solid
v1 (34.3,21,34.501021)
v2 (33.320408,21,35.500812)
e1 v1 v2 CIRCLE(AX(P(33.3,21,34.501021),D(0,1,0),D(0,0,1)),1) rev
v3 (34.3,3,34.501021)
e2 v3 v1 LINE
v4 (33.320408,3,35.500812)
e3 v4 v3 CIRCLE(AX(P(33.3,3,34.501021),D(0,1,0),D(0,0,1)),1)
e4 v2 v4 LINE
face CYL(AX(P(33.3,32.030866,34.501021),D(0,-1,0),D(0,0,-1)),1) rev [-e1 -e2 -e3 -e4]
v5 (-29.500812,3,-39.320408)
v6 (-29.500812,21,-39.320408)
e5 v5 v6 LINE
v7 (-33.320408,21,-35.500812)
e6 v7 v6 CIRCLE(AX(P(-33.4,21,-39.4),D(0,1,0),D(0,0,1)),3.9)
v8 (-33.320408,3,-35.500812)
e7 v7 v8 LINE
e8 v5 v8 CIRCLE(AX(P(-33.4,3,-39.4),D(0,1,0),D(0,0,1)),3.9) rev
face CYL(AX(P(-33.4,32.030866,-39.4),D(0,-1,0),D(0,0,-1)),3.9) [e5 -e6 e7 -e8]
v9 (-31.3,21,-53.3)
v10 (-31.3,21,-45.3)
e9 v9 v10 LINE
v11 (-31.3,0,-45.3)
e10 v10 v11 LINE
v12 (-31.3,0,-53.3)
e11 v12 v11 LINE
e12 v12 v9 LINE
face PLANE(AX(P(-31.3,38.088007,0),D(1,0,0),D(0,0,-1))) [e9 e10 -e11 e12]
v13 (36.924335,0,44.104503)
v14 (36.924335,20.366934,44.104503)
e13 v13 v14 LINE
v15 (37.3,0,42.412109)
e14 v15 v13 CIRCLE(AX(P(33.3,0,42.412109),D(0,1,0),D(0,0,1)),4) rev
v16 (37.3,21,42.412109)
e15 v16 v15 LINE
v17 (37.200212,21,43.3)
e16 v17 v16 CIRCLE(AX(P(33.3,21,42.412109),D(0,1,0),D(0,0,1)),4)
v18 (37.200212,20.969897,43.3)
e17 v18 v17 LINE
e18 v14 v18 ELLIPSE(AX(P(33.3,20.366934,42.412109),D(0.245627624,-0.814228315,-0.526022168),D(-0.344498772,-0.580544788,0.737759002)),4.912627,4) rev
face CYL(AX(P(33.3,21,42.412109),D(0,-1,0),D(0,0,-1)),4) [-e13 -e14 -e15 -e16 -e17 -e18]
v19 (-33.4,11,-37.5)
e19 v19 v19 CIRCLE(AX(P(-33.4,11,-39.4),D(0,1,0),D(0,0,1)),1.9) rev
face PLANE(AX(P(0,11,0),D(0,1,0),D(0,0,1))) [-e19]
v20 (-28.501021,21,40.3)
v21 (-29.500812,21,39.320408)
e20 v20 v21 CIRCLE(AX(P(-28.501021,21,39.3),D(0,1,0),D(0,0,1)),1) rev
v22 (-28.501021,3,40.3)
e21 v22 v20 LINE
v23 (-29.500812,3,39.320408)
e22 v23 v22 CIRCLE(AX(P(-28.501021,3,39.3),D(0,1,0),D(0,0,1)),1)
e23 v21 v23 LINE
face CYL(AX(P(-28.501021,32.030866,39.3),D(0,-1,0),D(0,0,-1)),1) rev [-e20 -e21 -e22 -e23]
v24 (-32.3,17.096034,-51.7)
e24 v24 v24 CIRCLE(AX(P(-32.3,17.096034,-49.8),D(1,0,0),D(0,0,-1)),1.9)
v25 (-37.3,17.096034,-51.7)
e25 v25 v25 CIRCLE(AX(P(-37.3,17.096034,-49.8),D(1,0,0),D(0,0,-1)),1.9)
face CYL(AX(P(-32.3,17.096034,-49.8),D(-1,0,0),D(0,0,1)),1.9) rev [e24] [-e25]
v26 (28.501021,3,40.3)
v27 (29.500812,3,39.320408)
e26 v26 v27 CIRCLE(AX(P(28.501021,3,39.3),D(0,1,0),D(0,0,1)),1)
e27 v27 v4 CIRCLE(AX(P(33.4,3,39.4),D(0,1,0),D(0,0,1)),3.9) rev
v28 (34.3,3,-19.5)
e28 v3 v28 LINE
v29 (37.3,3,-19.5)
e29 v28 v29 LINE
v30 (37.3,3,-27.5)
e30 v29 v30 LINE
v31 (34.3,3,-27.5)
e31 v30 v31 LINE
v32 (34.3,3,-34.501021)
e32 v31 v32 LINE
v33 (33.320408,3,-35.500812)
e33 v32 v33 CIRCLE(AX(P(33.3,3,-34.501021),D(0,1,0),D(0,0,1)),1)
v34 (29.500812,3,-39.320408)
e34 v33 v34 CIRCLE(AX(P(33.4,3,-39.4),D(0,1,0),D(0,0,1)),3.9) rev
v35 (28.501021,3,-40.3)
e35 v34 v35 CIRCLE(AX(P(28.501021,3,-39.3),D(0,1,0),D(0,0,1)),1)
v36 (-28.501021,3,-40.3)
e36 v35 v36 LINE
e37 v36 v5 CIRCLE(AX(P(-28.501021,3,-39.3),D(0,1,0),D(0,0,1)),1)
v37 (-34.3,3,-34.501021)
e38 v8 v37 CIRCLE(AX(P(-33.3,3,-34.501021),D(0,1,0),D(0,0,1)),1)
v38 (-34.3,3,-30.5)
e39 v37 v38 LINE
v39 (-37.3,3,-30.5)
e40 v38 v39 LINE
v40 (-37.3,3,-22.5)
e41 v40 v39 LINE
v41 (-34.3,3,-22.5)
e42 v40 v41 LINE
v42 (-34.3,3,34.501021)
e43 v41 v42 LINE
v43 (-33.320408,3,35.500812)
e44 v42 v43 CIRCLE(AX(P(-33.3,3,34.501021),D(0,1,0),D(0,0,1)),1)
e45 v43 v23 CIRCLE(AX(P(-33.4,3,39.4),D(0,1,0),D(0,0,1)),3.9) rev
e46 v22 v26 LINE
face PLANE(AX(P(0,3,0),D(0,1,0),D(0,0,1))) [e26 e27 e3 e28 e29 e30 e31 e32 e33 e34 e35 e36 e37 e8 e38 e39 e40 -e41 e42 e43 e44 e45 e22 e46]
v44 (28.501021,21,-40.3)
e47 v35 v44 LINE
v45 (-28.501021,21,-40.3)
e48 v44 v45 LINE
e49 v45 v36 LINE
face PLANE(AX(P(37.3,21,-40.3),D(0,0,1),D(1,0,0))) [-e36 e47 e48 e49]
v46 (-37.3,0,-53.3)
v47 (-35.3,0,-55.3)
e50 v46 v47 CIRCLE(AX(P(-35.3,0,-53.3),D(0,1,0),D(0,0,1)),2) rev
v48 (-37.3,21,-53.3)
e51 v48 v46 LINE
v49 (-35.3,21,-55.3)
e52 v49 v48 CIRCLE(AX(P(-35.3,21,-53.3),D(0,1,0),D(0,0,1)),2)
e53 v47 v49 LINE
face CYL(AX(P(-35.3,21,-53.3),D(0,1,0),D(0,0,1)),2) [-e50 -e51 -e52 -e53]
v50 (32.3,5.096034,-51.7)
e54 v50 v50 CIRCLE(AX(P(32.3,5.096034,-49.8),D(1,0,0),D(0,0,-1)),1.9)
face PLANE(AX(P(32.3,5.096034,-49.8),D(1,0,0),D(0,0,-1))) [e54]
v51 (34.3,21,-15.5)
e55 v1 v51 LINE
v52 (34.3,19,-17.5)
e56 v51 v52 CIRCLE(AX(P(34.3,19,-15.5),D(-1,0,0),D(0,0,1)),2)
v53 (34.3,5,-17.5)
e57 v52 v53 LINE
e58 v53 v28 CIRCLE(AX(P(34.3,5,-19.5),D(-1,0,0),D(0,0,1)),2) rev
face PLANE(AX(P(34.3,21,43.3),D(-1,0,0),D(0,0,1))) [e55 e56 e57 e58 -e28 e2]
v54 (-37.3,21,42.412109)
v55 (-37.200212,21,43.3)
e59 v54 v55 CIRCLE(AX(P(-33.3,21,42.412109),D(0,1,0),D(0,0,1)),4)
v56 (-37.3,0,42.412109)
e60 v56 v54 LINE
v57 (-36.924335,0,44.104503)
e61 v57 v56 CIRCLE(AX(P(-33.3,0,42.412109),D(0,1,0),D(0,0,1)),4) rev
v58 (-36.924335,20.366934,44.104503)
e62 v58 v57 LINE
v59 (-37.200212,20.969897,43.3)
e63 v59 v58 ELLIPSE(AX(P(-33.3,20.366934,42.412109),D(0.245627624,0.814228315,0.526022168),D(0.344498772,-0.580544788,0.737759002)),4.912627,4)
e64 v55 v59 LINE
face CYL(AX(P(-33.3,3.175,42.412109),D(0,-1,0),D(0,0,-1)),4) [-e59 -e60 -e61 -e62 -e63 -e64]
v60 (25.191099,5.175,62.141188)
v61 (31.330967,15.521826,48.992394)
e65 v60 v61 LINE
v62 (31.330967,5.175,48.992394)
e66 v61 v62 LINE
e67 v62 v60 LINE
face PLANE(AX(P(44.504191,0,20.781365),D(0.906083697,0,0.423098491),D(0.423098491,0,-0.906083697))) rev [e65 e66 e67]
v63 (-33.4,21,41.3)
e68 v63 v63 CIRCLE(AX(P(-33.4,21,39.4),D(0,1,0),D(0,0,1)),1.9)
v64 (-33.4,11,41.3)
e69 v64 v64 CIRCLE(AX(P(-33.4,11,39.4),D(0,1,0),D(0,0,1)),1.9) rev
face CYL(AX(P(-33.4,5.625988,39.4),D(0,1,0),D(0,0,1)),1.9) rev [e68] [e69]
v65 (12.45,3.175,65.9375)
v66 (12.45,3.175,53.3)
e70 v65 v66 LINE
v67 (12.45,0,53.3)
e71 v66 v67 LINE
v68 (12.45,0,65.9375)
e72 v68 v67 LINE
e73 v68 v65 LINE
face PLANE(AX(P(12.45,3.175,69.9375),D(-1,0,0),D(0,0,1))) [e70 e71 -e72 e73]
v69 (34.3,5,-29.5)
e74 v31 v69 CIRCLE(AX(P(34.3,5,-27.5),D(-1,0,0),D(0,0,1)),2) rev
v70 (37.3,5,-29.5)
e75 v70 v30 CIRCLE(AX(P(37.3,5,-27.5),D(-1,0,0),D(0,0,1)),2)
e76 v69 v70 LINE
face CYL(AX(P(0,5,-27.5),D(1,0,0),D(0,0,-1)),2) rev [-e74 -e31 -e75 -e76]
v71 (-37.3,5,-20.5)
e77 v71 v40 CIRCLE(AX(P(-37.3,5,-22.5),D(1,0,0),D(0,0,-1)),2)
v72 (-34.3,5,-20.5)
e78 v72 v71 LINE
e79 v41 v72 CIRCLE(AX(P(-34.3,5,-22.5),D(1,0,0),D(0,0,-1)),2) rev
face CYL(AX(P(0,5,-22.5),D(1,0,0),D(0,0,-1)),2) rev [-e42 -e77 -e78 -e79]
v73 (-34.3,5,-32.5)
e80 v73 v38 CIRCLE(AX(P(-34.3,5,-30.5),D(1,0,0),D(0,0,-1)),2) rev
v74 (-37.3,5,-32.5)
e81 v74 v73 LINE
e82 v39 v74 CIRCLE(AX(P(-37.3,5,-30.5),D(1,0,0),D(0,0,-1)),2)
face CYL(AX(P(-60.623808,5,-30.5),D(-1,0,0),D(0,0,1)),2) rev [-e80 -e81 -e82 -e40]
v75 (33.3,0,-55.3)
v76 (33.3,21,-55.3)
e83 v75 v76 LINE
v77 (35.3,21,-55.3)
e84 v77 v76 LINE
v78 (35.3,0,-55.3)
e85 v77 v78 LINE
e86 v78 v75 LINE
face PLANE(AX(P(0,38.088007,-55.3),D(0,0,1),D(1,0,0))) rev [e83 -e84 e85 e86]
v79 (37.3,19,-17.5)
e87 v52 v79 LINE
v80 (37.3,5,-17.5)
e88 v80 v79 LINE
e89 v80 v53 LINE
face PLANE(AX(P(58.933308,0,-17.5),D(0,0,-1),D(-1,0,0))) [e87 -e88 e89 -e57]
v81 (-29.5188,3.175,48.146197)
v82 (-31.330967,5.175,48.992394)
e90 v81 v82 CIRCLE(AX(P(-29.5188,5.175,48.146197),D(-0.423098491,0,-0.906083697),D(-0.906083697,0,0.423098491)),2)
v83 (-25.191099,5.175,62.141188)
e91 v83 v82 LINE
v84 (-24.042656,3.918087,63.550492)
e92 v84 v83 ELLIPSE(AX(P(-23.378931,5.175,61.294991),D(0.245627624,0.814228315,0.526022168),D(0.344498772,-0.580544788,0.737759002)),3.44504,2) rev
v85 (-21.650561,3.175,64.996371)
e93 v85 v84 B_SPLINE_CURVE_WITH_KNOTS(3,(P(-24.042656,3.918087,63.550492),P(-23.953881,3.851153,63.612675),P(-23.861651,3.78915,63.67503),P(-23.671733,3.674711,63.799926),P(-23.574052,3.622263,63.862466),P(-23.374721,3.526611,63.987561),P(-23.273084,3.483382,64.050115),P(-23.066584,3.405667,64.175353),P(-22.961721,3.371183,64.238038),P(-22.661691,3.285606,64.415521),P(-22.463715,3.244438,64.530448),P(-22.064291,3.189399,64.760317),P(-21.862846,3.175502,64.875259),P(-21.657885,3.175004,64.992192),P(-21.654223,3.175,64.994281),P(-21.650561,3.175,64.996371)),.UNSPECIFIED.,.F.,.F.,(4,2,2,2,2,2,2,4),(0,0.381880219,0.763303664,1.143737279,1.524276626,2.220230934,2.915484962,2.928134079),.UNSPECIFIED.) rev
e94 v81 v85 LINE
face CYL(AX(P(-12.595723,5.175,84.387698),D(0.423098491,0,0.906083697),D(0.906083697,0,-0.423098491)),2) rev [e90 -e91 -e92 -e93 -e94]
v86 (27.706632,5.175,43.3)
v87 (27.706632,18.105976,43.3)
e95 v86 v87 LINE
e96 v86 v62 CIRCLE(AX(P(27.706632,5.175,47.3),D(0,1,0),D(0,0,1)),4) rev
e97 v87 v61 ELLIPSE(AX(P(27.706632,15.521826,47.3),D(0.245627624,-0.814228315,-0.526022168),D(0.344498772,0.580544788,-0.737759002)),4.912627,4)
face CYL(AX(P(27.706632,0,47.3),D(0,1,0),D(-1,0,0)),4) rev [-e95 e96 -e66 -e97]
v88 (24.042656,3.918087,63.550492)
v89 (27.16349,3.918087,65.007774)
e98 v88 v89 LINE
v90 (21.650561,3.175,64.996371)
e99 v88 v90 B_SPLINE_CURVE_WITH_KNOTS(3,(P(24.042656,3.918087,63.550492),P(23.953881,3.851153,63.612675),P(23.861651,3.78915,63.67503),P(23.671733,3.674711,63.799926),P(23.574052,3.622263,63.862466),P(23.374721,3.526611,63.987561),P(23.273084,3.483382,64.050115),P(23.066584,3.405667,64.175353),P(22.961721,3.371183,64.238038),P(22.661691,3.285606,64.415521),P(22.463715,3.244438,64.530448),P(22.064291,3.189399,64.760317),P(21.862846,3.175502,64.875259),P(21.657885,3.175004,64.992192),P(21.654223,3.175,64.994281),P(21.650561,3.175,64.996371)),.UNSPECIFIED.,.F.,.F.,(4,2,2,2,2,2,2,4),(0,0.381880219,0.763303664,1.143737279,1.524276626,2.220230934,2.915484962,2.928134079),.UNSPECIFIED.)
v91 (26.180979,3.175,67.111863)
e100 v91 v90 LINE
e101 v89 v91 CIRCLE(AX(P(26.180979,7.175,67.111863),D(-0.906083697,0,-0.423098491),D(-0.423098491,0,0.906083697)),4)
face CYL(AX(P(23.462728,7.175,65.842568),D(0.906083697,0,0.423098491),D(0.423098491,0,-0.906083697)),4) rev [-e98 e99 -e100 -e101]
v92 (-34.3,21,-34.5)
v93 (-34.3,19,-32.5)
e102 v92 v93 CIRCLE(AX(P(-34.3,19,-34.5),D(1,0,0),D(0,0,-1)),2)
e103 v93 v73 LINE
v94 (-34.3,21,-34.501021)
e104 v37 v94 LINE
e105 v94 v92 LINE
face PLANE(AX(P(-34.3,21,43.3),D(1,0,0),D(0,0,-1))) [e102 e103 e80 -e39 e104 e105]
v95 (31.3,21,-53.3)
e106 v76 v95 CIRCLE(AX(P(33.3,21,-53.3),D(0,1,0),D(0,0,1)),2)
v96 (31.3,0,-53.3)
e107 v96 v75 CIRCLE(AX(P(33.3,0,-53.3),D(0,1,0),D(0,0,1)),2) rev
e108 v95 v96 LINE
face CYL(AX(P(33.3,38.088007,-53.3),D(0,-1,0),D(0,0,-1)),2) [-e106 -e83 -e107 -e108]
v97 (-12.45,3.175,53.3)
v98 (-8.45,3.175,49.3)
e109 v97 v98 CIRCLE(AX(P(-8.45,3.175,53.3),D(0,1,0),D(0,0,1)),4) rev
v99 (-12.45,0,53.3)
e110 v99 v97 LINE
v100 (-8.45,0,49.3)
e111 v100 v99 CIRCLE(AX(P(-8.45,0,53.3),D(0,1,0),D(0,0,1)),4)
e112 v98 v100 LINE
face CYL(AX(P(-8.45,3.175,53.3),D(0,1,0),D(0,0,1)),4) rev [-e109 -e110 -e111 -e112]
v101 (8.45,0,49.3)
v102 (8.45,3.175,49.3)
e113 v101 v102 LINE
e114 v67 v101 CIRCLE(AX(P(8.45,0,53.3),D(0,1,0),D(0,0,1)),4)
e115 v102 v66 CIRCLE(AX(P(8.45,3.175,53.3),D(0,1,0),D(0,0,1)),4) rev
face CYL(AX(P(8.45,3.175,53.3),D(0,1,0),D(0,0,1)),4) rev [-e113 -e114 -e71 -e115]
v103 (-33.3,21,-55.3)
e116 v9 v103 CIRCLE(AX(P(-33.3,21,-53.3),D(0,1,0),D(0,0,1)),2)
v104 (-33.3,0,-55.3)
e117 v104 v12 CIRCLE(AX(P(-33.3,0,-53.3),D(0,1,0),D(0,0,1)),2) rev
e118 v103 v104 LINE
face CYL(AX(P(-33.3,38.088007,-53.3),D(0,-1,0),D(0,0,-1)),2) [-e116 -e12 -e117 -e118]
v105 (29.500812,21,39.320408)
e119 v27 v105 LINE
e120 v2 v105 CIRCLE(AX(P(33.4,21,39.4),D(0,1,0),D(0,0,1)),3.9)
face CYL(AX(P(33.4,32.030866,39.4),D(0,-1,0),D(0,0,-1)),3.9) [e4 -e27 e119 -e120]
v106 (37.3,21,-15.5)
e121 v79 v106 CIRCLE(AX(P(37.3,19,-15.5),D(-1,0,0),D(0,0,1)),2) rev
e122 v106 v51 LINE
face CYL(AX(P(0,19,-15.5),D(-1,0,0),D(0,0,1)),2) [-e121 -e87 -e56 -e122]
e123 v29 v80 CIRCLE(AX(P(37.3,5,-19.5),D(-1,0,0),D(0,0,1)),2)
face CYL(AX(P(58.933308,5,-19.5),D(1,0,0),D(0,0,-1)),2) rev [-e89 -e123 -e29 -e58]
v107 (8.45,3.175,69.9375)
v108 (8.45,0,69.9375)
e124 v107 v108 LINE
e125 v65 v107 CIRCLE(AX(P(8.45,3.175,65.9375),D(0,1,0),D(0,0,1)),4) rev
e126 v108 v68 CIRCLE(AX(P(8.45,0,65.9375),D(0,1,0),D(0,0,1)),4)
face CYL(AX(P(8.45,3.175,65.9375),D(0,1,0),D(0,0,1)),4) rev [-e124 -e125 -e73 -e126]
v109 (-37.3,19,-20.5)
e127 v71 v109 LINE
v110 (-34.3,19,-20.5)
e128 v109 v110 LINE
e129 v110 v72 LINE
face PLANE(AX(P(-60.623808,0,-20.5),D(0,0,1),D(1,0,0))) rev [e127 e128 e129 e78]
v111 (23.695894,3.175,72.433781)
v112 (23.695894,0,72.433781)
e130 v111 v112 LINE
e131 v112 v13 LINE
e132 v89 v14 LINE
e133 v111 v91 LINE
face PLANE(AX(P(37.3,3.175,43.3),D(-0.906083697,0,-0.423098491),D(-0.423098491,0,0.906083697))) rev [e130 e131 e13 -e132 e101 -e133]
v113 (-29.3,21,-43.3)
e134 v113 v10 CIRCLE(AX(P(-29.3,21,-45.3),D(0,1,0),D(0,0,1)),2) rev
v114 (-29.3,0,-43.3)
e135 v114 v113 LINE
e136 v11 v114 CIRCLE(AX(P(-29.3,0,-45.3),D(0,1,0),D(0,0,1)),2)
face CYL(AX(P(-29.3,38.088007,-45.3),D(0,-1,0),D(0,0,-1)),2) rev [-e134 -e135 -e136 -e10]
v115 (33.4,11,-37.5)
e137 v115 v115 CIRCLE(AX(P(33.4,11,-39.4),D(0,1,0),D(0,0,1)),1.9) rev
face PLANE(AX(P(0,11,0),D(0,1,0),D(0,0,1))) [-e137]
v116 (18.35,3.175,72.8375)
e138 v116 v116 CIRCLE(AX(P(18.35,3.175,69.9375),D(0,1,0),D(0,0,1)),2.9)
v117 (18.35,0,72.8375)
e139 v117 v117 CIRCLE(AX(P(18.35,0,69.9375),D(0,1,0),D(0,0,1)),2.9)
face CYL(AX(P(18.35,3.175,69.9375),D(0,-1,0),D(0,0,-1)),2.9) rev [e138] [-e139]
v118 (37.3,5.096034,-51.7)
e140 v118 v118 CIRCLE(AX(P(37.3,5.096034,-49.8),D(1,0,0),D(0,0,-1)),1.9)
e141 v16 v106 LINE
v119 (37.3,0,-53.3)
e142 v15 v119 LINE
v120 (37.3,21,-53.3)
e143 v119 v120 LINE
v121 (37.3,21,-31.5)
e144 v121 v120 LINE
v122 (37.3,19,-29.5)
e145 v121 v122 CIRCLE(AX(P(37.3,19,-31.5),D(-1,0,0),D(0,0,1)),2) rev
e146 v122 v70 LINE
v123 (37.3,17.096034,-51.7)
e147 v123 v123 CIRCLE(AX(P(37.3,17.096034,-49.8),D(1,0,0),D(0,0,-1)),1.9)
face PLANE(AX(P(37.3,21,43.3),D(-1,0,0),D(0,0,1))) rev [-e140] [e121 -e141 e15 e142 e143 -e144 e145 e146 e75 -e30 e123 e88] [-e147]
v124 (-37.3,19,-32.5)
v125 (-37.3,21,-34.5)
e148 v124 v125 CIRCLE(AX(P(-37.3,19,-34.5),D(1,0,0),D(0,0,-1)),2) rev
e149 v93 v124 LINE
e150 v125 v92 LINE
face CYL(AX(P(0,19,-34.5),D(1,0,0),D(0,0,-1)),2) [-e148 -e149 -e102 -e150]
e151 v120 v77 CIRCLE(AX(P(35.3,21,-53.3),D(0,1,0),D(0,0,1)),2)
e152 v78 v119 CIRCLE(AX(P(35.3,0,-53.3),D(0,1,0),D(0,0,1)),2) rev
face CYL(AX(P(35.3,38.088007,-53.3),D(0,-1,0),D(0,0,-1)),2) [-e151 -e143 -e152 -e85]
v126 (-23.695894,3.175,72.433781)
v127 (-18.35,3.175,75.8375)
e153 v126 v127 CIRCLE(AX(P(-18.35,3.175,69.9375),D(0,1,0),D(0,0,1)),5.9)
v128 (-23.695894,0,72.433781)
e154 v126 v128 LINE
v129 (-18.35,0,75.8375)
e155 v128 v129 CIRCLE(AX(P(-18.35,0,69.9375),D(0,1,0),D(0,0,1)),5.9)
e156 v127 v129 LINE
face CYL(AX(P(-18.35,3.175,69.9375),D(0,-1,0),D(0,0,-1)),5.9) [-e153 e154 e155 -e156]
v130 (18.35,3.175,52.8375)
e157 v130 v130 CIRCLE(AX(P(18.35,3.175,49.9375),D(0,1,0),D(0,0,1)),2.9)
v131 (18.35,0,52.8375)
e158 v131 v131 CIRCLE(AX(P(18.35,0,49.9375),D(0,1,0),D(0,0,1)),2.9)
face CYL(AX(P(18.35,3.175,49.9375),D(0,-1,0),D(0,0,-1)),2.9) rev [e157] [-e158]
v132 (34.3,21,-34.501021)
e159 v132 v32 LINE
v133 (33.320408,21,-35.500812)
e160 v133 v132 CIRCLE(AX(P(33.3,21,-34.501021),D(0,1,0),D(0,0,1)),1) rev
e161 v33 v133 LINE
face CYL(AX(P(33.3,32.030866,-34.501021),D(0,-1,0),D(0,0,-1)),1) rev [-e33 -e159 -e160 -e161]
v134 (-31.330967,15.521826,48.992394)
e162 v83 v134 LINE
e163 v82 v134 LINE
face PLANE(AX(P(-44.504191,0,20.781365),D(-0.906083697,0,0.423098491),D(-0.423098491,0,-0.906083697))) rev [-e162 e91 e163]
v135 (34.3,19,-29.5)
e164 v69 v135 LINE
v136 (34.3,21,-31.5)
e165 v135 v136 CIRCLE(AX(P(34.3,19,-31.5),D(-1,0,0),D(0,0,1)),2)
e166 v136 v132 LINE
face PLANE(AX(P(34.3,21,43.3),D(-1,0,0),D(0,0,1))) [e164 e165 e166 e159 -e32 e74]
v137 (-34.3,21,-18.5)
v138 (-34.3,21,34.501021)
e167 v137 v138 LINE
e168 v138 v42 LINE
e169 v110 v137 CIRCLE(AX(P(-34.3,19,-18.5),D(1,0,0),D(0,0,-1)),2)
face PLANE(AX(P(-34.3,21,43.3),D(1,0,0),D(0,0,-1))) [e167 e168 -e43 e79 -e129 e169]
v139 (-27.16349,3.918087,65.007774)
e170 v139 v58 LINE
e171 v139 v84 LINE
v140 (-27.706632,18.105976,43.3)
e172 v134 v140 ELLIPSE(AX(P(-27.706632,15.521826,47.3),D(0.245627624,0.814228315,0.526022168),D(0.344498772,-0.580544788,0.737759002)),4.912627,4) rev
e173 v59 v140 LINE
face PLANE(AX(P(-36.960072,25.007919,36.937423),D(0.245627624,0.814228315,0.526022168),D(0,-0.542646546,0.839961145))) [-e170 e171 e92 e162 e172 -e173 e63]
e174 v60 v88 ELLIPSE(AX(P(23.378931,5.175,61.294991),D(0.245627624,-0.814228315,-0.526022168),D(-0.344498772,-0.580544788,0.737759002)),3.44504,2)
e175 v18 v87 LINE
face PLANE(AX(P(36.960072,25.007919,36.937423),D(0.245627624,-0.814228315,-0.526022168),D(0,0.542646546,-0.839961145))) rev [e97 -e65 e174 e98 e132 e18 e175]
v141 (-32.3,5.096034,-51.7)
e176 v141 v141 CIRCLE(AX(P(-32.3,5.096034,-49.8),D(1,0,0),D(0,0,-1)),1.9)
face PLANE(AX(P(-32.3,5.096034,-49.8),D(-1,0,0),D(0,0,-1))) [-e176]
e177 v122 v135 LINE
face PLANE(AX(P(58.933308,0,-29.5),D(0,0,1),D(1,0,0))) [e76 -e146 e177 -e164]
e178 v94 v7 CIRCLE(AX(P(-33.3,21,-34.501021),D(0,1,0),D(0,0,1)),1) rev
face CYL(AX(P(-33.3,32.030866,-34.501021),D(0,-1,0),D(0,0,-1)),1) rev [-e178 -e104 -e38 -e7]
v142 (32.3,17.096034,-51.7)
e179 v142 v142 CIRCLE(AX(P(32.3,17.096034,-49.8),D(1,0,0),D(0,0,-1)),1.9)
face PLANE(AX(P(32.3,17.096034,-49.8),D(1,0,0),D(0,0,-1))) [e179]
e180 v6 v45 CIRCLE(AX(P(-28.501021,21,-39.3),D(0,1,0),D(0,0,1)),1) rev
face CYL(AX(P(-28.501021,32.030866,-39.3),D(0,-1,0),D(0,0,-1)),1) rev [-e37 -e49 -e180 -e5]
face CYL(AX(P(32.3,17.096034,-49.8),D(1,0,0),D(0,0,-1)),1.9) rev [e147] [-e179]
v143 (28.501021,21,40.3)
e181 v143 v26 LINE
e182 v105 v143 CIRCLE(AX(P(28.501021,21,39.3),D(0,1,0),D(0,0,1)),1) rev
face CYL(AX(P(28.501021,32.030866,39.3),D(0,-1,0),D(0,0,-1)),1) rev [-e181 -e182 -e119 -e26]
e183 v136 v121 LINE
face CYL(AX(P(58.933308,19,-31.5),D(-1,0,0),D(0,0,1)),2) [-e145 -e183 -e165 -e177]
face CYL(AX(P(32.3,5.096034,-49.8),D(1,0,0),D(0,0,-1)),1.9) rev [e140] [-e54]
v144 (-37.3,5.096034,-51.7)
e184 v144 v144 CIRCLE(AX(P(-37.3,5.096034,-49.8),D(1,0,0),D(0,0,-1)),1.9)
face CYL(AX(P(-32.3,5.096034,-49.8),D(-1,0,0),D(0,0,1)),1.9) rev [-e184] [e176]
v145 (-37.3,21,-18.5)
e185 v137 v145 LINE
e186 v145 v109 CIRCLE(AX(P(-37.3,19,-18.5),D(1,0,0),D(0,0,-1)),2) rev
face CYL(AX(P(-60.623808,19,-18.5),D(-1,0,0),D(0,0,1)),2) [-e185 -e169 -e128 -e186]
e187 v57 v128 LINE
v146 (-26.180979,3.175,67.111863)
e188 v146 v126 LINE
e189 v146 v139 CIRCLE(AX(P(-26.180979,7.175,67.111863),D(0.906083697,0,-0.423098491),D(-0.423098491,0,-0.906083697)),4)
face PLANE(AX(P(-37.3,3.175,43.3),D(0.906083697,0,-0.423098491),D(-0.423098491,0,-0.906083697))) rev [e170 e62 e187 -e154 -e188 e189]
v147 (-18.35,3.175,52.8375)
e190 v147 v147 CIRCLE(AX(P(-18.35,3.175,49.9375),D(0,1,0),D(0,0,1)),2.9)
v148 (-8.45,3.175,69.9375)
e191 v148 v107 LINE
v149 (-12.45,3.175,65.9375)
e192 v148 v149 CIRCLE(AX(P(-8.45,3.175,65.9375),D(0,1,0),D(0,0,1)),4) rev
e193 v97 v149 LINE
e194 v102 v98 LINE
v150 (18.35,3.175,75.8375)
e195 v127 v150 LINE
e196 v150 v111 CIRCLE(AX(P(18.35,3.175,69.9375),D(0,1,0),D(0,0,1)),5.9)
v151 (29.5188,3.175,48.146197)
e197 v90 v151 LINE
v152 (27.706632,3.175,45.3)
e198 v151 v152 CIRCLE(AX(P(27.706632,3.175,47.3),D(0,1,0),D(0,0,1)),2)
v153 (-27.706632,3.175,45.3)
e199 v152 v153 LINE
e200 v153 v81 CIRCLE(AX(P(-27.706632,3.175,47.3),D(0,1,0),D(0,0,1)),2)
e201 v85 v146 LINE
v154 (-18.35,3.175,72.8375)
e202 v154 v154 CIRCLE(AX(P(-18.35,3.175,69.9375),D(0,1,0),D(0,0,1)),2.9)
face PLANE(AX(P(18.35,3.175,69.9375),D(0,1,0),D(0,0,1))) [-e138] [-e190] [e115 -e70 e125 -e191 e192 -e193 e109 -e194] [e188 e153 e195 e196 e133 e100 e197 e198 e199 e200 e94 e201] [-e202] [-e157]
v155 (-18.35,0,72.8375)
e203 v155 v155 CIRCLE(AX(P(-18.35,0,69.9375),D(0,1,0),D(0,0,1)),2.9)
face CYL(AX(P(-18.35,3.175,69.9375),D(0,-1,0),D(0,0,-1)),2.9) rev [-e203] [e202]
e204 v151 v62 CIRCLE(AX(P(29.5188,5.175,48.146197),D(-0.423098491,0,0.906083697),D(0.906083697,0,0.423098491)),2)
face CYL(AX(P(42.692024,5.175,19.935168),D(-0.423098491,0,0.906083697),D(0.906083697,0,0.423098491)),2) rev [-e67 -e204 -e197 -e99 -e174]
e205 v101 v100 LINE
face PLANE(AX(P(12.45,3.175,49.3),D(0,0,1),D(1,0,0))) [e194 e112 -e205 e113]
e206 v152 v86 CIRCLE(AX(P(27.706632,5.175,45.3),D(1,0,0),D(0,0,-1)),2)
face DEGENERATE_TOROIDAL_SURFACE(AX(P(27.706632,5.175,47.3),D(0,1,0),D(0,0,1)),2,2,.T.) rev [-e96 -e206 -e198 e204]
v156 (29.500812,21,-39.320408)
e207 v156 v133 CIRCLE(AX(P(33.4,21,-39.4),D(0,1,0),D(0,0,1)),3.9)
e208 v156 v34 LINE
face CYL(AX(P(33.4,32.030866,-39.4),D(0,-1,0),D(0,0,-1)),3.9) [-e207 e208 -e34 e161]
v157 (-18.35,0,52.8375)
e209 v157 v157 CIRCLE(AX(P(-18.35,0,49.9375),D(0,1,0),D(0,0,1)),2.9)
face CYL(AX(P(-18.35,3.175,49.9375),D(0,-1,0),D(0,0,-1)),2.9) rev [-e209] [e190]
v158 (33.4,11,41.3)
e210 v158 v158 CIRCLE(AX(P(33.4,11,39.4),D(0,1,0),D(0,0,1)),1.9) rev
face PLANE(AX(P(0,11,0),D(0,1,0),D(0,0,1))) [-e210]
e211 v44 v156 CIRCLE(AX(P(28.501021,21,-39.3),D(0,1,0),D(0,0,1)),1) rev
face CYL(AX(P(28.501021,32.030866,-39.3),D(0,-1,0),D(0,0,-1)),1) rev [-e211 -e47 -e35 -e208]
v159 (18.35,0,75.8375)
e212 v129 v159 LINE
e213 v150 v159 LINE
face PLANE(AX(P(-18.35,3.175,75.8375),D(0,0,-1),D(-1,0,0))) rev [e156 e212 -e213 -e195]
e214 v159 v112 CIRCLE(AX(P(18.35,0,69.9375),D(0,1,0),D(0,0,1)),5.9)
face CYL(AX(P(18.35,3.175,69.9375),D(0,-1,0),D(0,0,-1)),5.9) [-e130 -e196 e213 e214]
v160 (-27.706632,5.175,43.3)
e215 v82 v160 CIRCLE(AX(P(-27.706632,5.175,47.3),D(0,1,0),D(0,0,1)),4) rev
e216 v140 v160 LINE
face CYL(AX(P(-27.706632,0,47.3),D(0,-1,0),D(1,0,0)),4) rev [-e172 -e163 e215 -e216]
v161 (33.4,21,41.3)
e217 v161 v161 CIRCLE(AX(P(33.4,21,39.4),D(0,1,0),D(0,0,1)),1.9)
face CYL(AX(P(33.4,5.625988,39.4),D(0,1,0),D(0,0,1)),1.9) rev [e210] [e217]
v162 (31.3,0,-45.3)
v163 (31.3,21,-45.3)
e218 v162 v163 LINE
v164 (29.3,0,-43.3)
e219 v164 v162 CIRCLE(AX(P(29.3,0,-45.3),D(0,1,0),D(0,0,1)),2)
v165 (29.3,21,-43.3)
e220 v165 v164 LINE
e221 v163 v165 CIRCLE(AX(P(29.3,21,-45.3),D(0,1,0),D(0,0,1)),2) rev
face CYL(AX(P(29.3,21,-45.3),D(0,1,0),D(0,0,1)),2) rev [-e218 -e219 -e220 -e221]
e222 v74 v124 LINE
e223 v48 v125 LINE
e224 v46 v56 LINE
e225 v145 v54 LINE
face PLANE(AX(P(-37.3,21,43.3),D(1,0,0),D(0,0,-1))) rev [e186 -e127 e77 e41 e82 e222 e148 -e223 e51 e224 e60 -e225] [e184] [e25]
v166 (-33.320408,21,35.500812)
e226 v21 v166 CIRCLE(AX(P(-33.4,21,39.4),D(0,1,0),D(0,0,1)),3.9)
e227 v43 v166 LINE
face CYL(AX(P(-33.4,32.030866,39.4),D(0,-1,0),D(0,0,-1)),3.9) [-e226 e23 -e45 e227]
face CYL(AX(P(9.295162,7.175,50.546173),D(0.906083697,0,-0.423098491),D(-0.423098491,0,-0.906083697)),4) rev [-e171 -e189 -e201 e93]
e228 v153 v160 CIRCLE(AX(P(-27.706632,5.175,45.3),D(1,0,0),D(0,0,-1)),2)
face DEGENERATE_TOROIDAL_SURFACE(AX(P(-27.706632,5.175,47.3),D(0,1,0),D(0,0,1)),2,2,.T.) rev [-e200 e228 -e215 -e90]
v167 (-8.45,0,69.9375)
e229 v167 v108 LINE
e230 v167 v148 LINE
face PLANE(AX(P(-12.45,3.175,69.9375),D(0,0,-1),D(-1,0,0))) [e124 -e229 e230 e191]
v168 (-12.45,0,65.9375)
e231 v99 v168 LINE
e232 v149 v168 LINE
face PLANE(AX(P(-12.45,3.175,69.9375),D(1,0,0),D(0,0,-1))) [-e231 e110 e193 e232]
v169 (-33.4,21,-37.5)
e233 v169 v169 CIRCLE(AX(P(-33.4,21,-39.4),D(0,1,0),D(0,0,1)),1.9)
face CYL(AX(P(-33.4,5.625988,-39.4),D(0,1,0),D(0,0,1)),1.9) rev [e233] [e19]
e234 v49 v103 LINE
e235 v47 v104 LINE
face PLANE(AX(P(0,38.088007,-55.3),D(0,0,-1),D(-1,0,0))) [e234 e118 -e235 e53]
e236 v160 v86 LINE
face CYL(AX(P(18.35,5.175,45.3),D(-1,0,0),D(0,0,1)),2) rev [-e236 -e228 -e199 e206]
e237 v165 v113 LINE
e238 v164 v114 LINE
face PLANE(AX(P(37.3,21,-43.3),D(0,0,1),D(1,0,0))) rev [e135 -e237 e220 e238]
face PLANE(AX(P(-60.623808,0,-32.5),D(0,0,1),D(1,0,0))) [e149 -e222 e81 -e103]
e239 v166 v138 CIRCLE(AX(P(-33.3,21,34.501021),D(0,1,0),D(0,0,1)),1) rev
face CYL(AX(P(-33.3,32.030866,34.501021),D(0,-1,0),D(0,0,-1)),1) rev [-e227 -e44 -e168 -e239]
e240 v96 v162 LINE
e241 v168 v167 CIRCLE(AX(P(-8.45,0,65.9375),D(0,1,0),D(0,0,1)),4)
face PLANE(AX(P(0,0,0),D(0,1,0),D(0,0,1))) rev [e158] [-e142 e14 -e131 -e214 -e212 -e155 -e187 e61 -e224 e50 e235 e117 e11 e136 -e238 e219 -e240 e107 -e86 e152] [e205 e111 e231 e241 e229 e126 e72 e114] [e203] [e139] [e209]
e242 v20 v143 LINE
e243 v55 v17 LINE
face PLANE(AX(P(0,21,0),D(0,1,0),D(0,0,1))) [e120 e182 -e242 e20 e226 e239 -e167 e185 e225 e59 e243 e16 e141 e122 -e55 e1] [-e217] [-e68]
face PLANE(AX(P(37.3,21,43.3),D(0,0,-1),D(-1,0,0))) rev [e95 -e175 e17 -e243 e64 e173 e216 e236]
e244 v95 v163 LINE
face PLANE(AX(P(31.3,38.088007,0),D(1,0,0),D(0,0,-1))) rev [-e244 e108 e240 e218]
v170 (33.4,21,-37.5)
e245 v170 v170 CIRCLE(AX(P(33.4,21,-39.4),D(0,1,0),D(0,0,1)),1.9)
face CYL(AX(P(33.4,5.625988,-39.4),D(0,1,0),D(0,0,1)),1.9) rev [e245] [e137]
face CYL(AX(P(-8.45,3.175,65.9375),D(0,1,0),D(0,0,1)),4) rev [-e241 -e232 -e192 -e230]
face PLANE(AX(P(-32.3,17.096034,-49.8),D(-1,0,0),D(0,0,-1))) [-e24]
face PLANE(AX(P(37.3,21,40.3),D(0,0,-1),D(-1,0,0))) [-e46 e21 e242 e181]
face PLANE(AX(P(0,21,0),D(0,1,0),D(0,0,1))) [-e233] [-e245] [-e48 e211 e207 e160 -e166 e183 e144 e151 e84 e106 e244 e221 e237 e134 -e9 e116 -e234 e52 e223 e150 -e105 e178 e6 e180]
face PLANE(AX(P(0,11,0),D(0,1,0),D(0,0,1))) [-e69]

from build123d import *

# Parameters (mm, degrees)
SKETCH1_W           = 74.6
SKETCH1_H           = 86.6
BOSS_EXTRUDE1_DEPTH = 21
SHELL1_T            = -3
SKETCH3_R           = 2.9
SKETCH3_W           = 24.9
SKETCH3_H           = 20.6375
BOSS_EXTRUDE2_DEPTH = 3.175
FILLET2_R           = 4
BOSS_EXTRUDE3_DEPTH = 3
FILLET3_R           = 4
FILLET4_R           = 4
FILLET5_R           = 2
SKETCH5_W           = 12
SKETCH5_H           = 20
CUT_EXTRUDE1_DEPTH  = 37.3
CUT_EXTRUDE2_DEPTH  = 37.3
FILLET6_R           = 2
BOSS_EXTRUDE4_DEPTH = 21
FILLET7_R           = 2
FILLET8_R           = 2
SKETCH8_R           = 1.9
CUT_EXTRUDE3_DEPTH  = 5
SKETCH9_R           = 3.9
BOSS_EXTRUDE5_DEPTH = 21
FILLET9_R           = 1
CUT_EXTRUDE4_START  = -10
SKETCH10_R          = 1.9
CUT_EXTRUDE4_DEPTH  = 10


with BuildPart() as part:
    # Sketch1 → Boss-Extrude1 (new body)
    with BuildSketch(Plane(origin=(0, 0, 0), x_dir=(1, 0, 0), z_dir=(0, 1, 0))):
        Rectangle(SKETCH1_W, SKETCH1_H)
    extrude(amount=BOSS_EXTRUDE1_DEPTH)

    # Shell1
    shell1_openings = [part.faces().sort_by_distance(p)[0] for p in [
        (0, 21, 0),
    ]]
    offset(amount=SHELL1_T, openings=shell1_openings, kind=Kind.INTERSECTION)

    # Sketch3 → Boss-Extrude2 (add)
    with BuildSketch(Plane(origin=(0, 0, 0), x_dir=(1, 0, 0), z_dir=(0, 1, 0))):
        with BuildLine():
            Line((-37.3, -43.3), (-23.695893814, -72.433781099))
            ThreePointArc((-23.695893814, -72.433781099), (-21.518749084, -74.914349329), (-18.35, -75.8375))
            Line((-18.35, -75.8375), (18.35, -75.8375))
            ThreePointArc((18.35, -75.8375), (21.518749084, -74.914349329), (23.695893814, -72.433781099))
            Line((23.695893814, -72.433781099), (37.3, -43.3))
            Line((37.3, -43.3), (-37.3, -43.3))
        make_face()
        with Locations(Location((-18.35, -69.9375, 0), (0, 0, 270))):
            Circle(SKETCH3_R, mode=Mode.SUBTRACT)
        with Locations(Location((18.35, -69.9375, 0), (0, 0, 270))):
            Circle(SKETCH3_R, mode=Mode.SUBTRACT)
        with Locations(Location((18.35, -49.9375, 0), (0, 0, 270))):
            Circle(SKETCH3_R, mode=Mode.SUBTRACT)
        with Locations(Location((-18.35, -49.9375, 0), (0, 0, 270))):
            Circle(SKETCH3_R, mode=Mode.SUBTRACT)
        with Locations((0, -59.61875)):
            Rectangle(SKETCH3_W, SKETCH3_H, mode=Mode.SUBTRACT)
    extrude(amount=BOSS_EXTRUDE2_DEPTH)

    # Fillet2
    fillet2_edges = [part.edges().sort_by_distance(p)[0] for p in [
        (12.45, 1.5875, 69.9375),
        (12.45, 1.5875, 49.3),
        (-12.45, 1.5875, 49.3),
        (-12.45, 1.5875, 69.9375),
    ]]
    fillet(fillet2_edges, radius=FILLET2_R)

    # Sketch4 → Boss-Extrude3 (add)
    with BuildSketch(Plane(origin=(47.22244251, 0, 22.050660711), x_dir=(0.4230984913948713, 0, -0.9060836973367219), z_dir=(0.9060836973367219, 0, 0.4230984913948713))):
        Polygon((-23.451850366, 3.175), (-23.451850366, 21), (-48.451850366, 3.175), align=None)
    boss_extrude3 = extrude(amount=-BOSS_EXTRUDE3_DEPTH)

    # Mirror1: Boss-Extrude3 across plane
    add(boss_extrude3.mirror(Plane(origin=(0, 0, 0), x_dir=(0, 0, 1), z_dir=(1, 0, 0))))

    # Fillet3
    # the kernel refuses this fillet: 4 mm, written as the material it adds along each edge
    with BuildSketch(Plane(origin=(33.989047591, 35.70722548, 43.3), x_dir=(-1, 0, 0), z_dir=(0, -1, 0))) as fillet3_piece_1_section:
        with BuildLine():
            CenterArc((FILLET3_R * 1.57060379254, -FILLET3_R), FILLET3_R, 90, 115.030363343)
            Line((FILLET3_R * 0.664520095202, -FILLET3_R * 1.42309849139), (0, 0))
            Line((0, 0), (FILLET3_R * 1.57060379254, 0))
        make_face()
    fillet3_piece_1 = extrude(amount=32.53222548, mode=Mode.PRIVATE)
    fillet3_piece_1 = split(fillet3_piece_1, bisect_by=Plane(origin=(30.311758397, 15.920235221, 47.899774075), z_dir=(0.2456276241787504, -0.8142283147913327, -0.526022168384916)), keep=Keep.TOP, mode=Mode.PRIVATE)
    add(fillet3_piece_1)
    with BuildSketch(Plane(origin=(-33.989047591, 35.70722548, 43.3), x_dir=(1, 0, 0), z_dir=(0, -1, 0))) as fillet3_piece_2_section:
        with BuildLine():
            CenterArc((FILLET3_R * 1.57060379254, FILLET3_R), FILLET3_R, 154.969636657, 115.030363343)
            Line((FILLET3_R * 0.664520095202, FILLET3_R * 1.42309849139), (0, 0))
            Line((0, 0), (FILLET3_R * 1.57060379254, 0))
        make_face()
    fillet3_piece_2 = extrude(amount=32.53222548, mode=Mode.PRIVATE)
    fillet3_piece_2 = split(fillet3_piece_2, bisect_by=Plane(origin=(-30.311758397, 15.920235221, 47.899774075), z_dir=(-0.2456276241787504, -0.8142283147913327, -0.526022168384916)), keep=Keep.TOP, mode=Mode.PRIVATE)
    add(fillet3_piece_2)
    # the kernel refuses this fillet: 4 mm, written as the material it takes off along each edge
    with BuildSketch(Plane(origin=(37.3, -2.21972672, 43.3), x_dir=(0, 0, -1), z_dir=(0, 1, 0)), Plane(origin=(-37.3, -2.21972672, 43.3), x_dir=(0.42309849139487515, 0, 0.9060836973367199), z_dir=(0, 1, 0))) as fillet3_2_piece_1:
        with BuildLine():
            CenterArc((FILLET3_R * 0.221972672022, FILLET3_R), FILLET3_R, 244.969636657, 25.030363343)
            Line((-FILLET3_R * 0.201125819373, FILLET3_R * 0.0939163026633), (0, 0))
            Line((0, 0), (FILLET3_R * 0.221972672022, 0))
        make_face()
    extrude(amount=25.43945344, mode=Mode.SUBTRACT)
    with BuildSketch(Plane(origin=(-37.3, -10, -43.3), x_dir=(0, 0, 1), z_dir=(0, 1, 0))) as fillet3_2_piece_2:
        with BuildLine():
            CenterArc((FILLET3_R, FILLET3_R), FILLET3_R, 180, 90)
            Line((0, FILLET3_R), (0, 0))
            Line((0, 0), (FILLET3_R, 0))
        make_face()
    extrude(amount=41, mode=Mode.SUBTRACT)
    with BuildSketch(Plane(origin=(37.3, -10, -43.3), x_dir=(0, 0, 1), z_dir=(0, 1, 0))) as fillet3_2_piece_3:
        with BuildLine():
            CenterArc((FILLET3_R, -FILLET3_R), FILLET3_R, 90, 90)
            Line((0, -FILLET3_R), (0, 0))
            Line((0, 0), (FILLET3_R, 0))
        make_face()
    extrude(amount=41, mode=Mode.SUBTRACT)

    # Fillet4
    fillet4_edges = [part.edges().sort_by_distance(p)[0] for p in [
        (-25.363412169, 3.175, 65.317444696),
        (25.363412169, 3.175, 65.317444696),
    ]]
    fillet(fillet4_edges, radius=FILLET4_R)

    # Fillet5
    fillet5_edges = [part.edges().sort_by_distance(p)[0] for p in [
        (34.3, 12, 40.3),
        (34.3, 12, -40.3),
        (-34.3, 12, -40.3),
        (-34.3, 12, 40.3),
    ]]
    fillet(fillet5_edges, radius=FILLET5_R)

    # Sketch5 → Cut-Extrude1 (cut)
    with BuildSketch(Plane(origin=(0, 0, 0), x_dir=(0, 0, -1), z_dir=(1, 0, 0))):
        with Locations((26.5, 13)):
            Rectangle(SKETCH5_W, SKETCH5_H)
    extrude(amount=-CUT_EXTRUDE1_DEPTH, mode=Mode.SUBTRACT)

    # Sketch6 → Cut-Extrude2 (cut)
    with BuildSketch(Plane(origin=(0, 0, 0), x_dir=(0, 0, -1), z_dir=(1, 0, 0))):
        Polygon((29.5, 21), (17.5, 21), (17.5, 17), (17.5, 3), (29.5, 3), (29.5, 17), align=None)
    extrude(amount=CUT_EXTRUDE2_DEPTH, mode=Mode.SUBTRACT)

    # Fillet6
    fillet6_edges = [part.edges().sort_by_distance(p)[0] for p in [
        (-35.8, 21, -20.5),
        (-35.8, 21, -32.5),
        (-35.8, 3, -32.5),
        (-35.8, 3, -20.5),
        (35.8, 3, -29.5),
        (35.8, 3, -17.5),
        (35.8, 21, -17.5),
        (35.8, 21, -29.5),
    ]]
    fillet(fillet6_edges, radius=FILLET6_R)

    # Sketch7 → Boss-Extrude4 (add)
    with BuildSketch(Plane(origin=(0, 0, 0), x_dir=(1, 0, 0), z_dir=(0, 1, 0))):
        with BuildLine():
            Line((-37.3, 55.3), (-37.3, 39.3))
            ThreePointArc((-37.3, 39.3), (-36.128427125, 42.128427125), (-33.3, 43.3))
            Line((-33.3, 43.3), (-31.3, 43.3))
            Line((-31.3, 43.3), (-31.3, 55.3))
            Line((-31.3, 55.3), (-37.3, 55.3))
        make_face()
        with BuildLine():
            Line((31.3, 55.3), (31.3, 43.3))
            Line((31.3, 43.3), (33.3, 43.3))
            ThreePointArc((33.3, 43.3), (36.128427125, 42.128427125), (37.3, 39.3))
            Line((37.3, 39.3), (37.3, 55.3))
            Line((37.3, 55.3), (31.3, 55.3))
        make_face()
    extrude(amount=BOSS_EXTRUDE4_DEPTH)

    # Fillet7
    fillet7_edges = [part.edges().sort_by_distance(p)[0] for p in [
        (-37.3, 10.5, -55.3),
        (-31.3, 10.5, -55.3),
        (-31.3, 10.5, -43.3),
        (31.3, 10.5, -43.3),
        (31.3, 10.5, -55.3),
        (37.3, 10.5, -55.3),
    ]]
    fillet(fillet7_edges, radius=FILLET7_R)

    # Fillet8
    fillet8_edges = [part.edges().sort_by_distance(p)[0] for p in [
        (-27.396847741, 3.175, 57.417480766),
        (-31.08076756, 3.175, 45.151695536),
        (0, 3.175, 43.3),
        (31.08076756, 3.175, 45.151695536),
        (27.396847741, 3.175, 57.417480766),
    ]]
    fillet(fillet8_edges, radius=FILLET8_R)

    # Sketch8 → Cut-Extrude3 (cut)
    with BuildSketch(Plane(origin=(37.3, 0, 0), x_dir=(0, 0, -1), z_dir=(1, 0, 0))):
        with Locations((49.8, 5.096033911)):
            Circle(SKETCH8_R)
        with Locations((49.8, 17.096033911)):
            Circle(SKETCH8_R)
    cut_extrude3 = extrude(amount=-CUT_EXTRUDE3_DEPTH, mode=Mode.SUBTRACT)

    # Mirror2: Cut-Extrude3 across plane
    add(cut_extrude3.mirror(Plane(origin=(0, 0, 0), x_dir=(0, 0, 1), z_dir=(1, 0, 0))), mode=Mode.SUBTRACT)

    # Sketch9 → Boss-Extrude5 (add)
    with BuildSketch(Plane(origin=(0, 0, 0), x_dir=(1, 0, 0), z_dir=(0, 1, 0))):
        with Locations((33.4, 39.4)):
            Circle(SKETCH9_R)
        with Locations((-33.4, 39.4)):
            Circle(SKETCH9_R)
        with Locations((33.4, -39.4)):
            Circle(SKETCH9_R)
        with Locations((-33.4, -39.4)):
            Circle(SKETCH9_R)
    extrude(amount=BOSS_EXTRUDE5_DEPTH)

    # Fillet9
    fillet9_edges = [part.edges().sort_by_distance(p)[0] for p in [
        (34.3, 12, -35.605266808),
        (29.605266808, 12, -40.3),
        (-29.605266808, 12, -40.3),
        (-34.3, 12, -35.605266808),
        (29.605266808, 12, 40.3),
        (34.3, 12, 35.605266808),
        (-34.3, 12, 35.605266808),
        (-29.605266808, 12, 40.3),
    ]]
    fillet(fillet9_edges, radius=FILLET9_R)

    # Sketch10 → Cut-Extrude4 (cut)
    with BuildSketch(Plane(origin=(0, 21, 0), x_dir=(1, 0, 0), z_dir=(0, 1, 0)).offset(CUT_EXTRUDE4_START)):
        with Locations(Location((33.4, 39.4, 0), (0, 0, 270))):
            Circle(SKETCH10_R)
        with Locations(Location((-33.4, 39.4, 0), (0, 0, 270))):
            Circle(SKETCH10_R)
        with Locations(Location((-33.4, -39.4, 0), (0, 0, 270))):
            Circle(SKETCH10_R)
        with Locations(Location((33.4, -39.4, 0), (0, 0, 270))):
            Circle(SKETCH10_R)
    extrude(amount=CUT_EXTRUDE4_DEPTH, mode=Mode.SUBTRACT)


solid = part.part
